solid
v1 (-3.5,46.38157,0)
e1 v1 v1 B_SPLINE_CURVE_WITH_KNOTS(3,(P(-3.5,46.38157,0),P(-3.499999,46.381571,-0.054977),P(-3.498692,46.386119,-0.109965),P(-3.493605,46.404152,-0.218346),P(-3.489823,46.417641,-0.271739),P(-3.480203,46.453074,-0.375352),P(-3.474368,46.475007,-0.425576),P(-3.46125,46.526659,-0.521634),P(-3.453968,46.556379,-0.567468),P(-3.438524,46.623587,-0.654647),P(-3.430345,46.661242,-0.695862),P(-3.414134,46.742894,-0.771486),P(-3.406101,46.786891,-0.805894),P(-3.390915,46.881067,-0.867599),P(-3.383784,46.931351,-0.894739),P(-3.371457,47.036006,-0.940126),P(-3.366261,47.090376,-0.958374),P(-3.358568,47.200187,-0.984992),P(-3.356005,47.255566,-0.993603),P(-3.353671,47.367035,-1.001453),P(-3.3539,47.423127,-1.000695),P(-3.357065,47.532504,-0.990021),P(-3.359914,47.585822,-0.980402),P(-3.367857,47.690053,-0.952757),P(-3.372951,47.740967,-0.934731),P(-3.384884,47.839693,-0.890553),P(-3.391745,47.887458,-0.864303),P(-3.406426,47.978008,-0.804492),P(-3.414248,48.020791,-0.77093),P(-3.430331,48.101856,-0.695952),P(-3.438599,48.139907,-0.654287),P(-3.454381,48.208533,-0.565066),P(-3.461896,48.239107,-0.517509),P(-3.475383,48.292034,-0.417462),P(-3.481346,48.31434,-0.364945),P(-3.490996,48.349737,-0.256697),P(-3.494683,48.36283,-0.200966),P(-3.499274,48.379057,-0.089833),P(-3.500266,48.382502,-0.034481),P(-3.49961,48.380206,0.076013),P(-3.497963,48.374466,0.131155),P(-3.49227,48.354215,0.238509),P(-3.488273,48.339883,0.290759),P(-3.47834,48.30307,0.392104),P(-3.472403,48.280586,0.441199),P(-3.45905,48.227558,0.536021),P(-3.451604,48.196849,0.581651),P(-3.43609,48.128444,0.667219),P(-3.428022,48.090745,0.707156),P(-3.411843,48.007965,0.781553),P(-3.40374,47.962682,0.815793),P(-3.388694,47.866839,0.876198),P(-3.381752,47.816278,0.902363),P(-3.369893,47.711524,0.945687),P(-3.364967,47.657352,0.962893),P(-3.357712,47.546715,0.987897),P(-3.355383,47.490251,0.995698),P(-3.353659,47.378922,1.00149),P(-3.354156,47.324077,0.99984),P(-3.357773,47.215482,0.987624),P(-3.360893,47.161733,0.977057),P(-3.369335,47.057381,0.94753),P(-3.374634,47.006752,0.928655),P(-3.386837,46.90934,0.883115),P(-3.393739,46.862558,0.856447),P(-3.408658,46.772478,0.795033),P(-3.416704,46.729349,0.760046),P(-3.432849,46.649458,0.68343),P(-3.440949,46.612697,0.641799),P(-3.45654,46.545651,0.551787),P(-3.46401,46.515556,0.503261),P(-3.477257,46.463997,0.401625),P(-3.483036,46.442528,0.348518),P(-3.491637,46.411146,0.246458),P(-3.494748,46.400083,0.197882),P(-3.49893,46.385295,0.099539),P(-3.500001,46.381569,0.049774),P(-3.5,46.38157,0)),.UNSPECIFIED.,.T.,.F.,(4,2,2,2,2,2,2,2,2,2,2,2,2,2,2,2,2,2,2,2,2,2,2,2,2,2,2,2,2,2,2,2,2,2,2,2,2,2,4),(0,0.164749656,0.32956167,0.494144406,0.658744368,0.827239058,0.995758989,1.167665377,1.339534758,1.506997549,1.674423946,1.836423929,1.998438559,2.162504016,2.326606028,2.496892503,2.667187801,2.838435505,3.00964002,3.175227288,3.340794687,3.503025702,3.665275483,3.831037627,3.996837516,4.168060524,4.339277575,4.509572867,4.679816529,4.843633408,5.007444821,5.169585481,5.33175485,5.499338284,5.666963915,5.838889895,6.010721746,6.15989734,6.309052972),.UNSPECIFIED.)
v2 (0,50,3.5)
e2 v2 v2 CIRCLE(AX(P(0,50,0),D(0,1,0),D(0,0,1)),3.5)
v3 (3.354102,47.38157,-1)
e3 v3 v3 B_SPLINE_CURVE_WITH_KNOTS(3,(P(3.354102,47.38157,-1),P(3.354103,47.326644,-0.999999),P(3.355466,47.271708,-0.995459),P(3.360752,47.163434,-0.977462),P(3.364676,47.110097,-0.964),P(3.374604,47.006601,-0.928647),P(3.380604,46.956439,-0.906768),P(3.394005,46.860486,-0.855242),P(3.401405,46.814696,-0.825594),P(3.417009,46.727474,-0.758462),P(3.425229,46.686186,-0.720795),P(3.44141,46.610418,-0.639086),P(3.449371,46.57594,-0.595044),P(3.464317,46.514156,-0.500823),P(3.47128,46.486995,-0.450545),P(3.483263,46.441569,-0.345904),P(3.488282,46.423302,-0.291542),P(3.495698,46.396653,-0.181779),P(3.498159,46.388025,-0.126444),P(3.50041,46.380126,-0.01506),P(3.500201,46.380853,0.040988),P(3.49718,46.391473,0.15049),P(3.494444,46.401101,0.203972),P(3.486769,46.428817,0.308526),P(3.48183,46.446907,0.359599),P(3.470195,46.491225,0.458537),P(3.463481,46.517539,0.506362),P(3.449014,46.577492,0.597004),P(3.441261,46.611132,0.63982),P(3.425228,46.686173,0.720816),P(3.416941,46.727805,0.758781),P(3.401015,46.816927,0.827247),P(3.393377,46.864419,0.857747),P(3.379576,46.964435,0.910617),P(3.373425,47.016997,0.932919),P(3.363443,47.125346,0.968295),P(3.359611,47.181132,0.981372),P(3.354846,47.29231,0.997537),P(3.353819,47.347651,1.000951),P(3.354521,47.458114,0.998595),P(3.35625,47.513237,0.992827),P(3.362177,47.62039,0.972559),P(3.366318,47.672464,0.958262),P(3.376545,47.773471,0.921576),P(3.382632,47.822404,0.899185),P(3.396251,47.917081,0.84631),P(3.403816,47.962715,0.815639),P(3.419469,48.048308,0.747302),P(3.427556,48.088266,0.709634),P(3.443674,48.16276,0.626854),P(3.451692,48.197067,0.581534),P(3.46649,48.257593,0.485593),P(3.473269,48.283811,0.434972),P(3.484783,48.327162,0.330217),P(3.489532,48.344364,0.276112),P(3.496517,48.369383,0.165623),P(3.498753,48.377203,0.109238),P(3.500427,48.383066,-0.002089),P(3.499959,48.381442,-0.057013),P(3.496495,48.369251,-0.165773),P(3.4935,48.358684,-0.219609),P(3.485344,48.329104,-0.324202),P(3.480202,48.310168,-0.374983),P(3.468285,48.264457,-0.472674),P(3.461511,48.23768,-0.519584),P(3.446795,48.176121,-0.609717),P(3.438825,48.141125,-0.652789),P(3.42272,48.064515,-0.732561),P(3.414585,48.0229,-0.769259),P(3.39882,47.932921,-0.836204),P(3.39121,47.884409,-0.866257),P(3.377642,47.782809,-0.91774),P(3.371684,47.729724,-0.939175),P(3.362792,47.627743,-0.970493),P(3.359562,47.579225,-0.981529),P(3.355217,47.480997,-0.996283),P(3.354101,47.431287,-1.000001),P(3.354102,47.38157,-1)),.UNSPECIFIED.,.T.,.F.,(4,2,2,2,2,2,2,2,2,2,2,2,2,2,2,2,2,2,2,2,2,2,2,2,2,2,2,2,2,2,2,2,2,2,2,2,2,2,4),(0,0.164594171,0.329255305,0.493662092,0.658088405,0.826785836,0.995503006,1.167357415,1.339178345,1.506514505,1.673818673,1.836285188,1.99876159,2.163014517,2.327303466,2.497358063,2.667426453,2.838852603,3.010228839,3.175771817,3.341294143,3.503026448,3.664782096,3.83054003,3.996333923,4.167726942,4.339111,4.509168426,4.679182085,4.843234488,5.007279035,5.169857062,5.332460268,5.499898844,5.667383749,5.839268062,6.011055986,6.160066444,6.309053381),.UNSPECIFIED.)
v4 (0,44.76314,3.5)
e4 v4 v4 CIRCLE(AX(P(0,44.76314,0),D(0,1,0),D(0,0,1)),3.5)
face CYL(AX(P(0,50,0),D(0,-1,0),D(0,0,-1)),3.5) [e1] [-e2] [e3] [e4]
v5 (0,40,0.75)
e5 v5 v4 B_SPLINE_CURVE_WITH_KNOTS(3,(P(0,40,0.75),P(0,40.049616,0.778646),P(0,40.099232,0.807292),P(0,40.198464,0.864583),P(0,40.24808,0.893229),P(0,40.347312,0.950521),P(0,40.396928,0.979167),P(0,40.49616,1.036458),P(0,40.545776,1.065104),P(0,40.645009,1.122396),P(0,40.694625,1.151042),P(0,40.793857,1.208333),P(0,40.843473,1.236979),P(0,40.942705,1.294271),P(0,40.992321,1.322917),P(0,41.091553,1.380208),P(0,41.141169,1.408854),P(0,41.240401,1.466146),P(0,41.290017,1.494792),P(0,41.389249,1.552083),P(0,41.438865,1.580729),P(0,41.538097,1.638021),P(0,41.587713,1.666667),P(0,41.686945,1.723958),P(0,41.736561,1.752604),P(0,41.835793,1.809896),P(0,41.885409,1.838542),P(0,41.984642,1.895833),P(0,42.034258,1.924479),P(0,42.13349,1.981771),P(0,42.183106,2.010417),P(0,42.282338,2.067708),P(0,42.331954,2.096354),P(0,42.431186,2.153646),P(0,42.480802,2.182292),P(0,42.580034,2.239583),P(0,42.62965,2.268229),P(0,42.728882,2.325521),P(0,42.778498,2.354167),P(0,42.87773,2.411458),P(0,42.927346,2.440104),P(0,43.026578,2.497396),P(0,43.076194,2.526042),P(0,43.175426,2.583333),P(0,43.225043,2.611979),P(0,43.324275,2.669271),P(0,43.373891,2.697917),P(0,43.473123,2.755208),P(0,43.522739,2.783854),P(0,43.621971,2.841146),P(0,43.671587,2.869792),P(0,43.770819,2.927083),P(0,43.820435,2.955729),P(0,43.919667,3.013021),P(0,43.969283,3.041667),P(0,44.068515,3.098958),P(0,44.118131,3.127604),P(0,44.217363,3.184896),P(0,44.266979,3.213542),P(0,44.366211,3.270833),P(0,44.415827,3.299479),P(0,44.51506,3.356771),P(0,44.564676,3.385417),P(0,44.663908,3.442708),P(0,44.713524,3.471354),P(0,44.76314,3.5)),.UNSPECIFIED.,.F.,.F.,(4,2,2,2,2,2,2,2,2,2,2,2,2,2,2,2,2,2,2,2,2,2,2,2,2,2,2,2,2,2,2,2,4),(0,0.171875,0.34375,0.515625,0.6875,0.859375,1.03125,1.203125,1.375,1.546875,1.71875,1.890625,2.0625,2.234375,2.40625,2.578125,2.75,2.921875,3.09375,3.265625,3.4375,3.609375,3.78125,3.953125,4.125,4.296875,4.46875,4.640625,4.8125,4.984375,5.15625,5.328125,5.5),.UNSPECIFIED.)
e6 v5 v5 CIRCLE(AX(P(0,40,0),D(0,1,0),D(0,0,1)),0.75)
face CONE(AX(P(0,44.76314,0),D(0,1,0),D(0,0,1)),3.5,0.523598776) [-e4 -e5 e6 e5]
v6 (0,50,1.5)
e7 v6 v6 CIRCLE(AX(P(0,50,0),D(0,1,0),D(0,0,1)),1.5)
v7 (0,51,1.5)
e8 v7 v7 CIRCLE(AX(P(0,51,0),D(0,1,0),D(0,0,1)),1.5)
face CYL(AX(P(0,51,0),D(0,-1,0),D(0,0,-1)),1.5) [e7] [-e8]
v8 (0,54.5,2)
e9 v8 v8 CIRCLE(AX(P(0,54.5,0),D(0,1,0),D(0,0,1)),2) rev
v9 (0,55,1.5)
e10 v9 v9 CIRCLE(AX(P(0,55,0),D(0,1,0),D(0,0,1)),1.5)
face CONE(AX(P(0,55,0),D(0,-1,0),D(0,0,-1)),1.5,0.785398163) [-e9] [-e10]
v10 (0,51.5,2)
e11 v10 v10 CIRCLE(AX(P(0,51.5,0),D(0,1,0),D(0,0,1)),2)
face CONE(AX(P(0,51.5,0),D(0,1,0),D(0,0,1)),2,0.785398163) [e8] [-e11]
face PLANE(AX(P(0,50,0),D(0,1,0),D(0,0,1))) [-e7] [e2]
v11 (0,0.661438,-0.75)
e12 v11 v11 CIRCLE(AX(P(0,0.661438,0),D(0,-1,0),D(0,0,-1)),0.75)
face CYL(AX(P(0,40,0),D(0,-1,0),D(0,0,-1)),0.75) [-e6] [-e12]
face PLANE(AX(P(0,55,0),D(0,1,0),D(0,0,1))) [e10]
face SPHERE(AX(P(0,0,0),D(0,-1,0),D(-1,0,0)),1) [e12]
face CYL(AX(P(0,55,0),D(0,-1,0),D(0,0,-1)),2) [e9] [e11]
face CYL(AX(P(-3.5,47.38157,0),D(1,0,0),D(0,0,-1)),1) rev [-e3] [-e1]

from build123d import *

# Parameters (mm, degrees)
SKETCH2_R               = 0.75
BOSS_EXTRUDE2_DEPTH     = 40
SKETCH4_R               = 3.5
BOSS_EXTRUDE3_DEPTH     = 10
CHAMFER1_SIZE           = 4.763139721
CHAMFER1_SIZE_2         = 2.75
CUT_EXTRUDE4_DEPTH      = 51.244402673
CUT_EXTRUDE4_DEPTH_BACK = 51.244402673
SKETCH5_R               = 1
SKETCH6_R               = 1.5
BOSS_EXTRUDE4_DEPTH     = 1
SKETCH7_R               = 2
BOSS_EXTRUDE5_DEPTH     = 4
CHAMFER2_SIZE           = 0.5


# Some blends are built 0.0001 mm under size
with BuildPart() as part:
    # Sketch1 → Revolve1 (revolve)
    with BuildSketch(Plane.XY):
        with BuildLine():
            Line((0, 0), (0, -1))
            ThreePointArc((0, -1), (1, 0), (0, 1))
            Line((0, 1), (0, 0))
        make_face()
    revolve(axis=Axis((0, 0, 0), (0, 1, 0)))

    # Sketch2 → Boss-Extrude2 (add)
    with BuildSketch(Plane(origin=(0, 0, 0), x_dir=(1, 0, 0), z_dir=(0, 1, 0))):
        with Locations(Location((0, 0, 0), (0, 0, 90))):
            Circle(SKETCH2_R)
    extrude(amount=BOSS_EXTRUDE2_DEPTH)

    # Sketch4 → Boss-Extrude3 (add)
    with BuildSketch(Plane(origin=(0, 40, 0), x_dir=(1, 0, 0), z_dir=(0, 1, 0))):
        with Locations(Location((0, 0, 0), (0, 0, 270))):
            Circle(SKETCH4_R)
    extrude(amount=BOSS_EXTRUDE3_DEPTH)

    # Chamfer1
    # the kernel refuses this chamfer: 4.763139721, 2.75 mm, written as the material it takes off along each edge
    with BuildSketch(Plane(origin=(0, 40, 0), x_dir=(0, 0, 1), z_dir=(-1, 0, 0))) as chamfer1_piece_1_section:
        Polygon((3.5, CHAMFER1_SIZE), (3.5 - CHAMFER1_SIZE_2, 0), (3.5, 0), align=None)
    chamfer1_piece_1 = revolve(axis=Axis((0, 40, 0), (0, 1, 0)), mode=Mode.PRIVATE)
    chamfer1_piece_1 = chamfer1_piece_1 - Plane(origin=(0, 42.439255441, 0), x_dir=(0, 0, -1), z_dir=(0, -1, 0)) * Cylinder(0.75, 20, mode=Mode.PRIVATE)
    add(chamfer1_piece_1, mode=Mode.SUBTRACT)

    # Sketch5 → Cut-Extrude4 (cut, two sides: drawn at the far end of the back side and taken through both)
    with BuildSketch(Plane(origin=(0, 0, 0), x_dir=(0, 0, -1), z_dir=(1, 0, 0)).offset(-CUT_EXTRUDE4_DEPTH_BACK)):
        with Locations((0, 47.38156986)):
            Circle(SKETCH5_R)
    extrude(amount=CUT_EXTRUDE4_DEPTH + CUT_EXTRUDE4_DEPTH_BACK, mode=Mode.SUBTRACT)

    # Sketch6 → Boss-Extrude4 (add)
    with BuildSketch(Plane(origin=(0, 50, 0), x_dir=(1, 0, 0), z_dir=(0, 1, 0))):
        with Locations(Location((0, 0, 0), (0, 0, 270))):
            Circle(SKETCH6_R)
    extrude(amount=BOSS_EXTRUDE4_DEPTH)

    # Sketch7 → Boss-Extrude5 (add)
    with BuildSketch(Plane(origin=(0, 51, 0), x_dir=(1, 0, 0), z_dir=(0, 1, 0))):
        with Locations(Location((0, 0, 0), (0, 0, 270))):
            Circle(SKETCH7_R)
    extrude(amount=BOSS_EXTRUDE5_DEPTH)

    # Chamfer2
    chamfer2_edges = [part.edges().sort_by_distance(p)[0] for p in [
        (0, 51, -2),
        (0, 55, -2),
    ]]
    chamfer(chamfer2_edges, length=CHAMFER2_SIZE - 0.0001)  # a hair under: the kernel refuses the full size


solid = part.part
